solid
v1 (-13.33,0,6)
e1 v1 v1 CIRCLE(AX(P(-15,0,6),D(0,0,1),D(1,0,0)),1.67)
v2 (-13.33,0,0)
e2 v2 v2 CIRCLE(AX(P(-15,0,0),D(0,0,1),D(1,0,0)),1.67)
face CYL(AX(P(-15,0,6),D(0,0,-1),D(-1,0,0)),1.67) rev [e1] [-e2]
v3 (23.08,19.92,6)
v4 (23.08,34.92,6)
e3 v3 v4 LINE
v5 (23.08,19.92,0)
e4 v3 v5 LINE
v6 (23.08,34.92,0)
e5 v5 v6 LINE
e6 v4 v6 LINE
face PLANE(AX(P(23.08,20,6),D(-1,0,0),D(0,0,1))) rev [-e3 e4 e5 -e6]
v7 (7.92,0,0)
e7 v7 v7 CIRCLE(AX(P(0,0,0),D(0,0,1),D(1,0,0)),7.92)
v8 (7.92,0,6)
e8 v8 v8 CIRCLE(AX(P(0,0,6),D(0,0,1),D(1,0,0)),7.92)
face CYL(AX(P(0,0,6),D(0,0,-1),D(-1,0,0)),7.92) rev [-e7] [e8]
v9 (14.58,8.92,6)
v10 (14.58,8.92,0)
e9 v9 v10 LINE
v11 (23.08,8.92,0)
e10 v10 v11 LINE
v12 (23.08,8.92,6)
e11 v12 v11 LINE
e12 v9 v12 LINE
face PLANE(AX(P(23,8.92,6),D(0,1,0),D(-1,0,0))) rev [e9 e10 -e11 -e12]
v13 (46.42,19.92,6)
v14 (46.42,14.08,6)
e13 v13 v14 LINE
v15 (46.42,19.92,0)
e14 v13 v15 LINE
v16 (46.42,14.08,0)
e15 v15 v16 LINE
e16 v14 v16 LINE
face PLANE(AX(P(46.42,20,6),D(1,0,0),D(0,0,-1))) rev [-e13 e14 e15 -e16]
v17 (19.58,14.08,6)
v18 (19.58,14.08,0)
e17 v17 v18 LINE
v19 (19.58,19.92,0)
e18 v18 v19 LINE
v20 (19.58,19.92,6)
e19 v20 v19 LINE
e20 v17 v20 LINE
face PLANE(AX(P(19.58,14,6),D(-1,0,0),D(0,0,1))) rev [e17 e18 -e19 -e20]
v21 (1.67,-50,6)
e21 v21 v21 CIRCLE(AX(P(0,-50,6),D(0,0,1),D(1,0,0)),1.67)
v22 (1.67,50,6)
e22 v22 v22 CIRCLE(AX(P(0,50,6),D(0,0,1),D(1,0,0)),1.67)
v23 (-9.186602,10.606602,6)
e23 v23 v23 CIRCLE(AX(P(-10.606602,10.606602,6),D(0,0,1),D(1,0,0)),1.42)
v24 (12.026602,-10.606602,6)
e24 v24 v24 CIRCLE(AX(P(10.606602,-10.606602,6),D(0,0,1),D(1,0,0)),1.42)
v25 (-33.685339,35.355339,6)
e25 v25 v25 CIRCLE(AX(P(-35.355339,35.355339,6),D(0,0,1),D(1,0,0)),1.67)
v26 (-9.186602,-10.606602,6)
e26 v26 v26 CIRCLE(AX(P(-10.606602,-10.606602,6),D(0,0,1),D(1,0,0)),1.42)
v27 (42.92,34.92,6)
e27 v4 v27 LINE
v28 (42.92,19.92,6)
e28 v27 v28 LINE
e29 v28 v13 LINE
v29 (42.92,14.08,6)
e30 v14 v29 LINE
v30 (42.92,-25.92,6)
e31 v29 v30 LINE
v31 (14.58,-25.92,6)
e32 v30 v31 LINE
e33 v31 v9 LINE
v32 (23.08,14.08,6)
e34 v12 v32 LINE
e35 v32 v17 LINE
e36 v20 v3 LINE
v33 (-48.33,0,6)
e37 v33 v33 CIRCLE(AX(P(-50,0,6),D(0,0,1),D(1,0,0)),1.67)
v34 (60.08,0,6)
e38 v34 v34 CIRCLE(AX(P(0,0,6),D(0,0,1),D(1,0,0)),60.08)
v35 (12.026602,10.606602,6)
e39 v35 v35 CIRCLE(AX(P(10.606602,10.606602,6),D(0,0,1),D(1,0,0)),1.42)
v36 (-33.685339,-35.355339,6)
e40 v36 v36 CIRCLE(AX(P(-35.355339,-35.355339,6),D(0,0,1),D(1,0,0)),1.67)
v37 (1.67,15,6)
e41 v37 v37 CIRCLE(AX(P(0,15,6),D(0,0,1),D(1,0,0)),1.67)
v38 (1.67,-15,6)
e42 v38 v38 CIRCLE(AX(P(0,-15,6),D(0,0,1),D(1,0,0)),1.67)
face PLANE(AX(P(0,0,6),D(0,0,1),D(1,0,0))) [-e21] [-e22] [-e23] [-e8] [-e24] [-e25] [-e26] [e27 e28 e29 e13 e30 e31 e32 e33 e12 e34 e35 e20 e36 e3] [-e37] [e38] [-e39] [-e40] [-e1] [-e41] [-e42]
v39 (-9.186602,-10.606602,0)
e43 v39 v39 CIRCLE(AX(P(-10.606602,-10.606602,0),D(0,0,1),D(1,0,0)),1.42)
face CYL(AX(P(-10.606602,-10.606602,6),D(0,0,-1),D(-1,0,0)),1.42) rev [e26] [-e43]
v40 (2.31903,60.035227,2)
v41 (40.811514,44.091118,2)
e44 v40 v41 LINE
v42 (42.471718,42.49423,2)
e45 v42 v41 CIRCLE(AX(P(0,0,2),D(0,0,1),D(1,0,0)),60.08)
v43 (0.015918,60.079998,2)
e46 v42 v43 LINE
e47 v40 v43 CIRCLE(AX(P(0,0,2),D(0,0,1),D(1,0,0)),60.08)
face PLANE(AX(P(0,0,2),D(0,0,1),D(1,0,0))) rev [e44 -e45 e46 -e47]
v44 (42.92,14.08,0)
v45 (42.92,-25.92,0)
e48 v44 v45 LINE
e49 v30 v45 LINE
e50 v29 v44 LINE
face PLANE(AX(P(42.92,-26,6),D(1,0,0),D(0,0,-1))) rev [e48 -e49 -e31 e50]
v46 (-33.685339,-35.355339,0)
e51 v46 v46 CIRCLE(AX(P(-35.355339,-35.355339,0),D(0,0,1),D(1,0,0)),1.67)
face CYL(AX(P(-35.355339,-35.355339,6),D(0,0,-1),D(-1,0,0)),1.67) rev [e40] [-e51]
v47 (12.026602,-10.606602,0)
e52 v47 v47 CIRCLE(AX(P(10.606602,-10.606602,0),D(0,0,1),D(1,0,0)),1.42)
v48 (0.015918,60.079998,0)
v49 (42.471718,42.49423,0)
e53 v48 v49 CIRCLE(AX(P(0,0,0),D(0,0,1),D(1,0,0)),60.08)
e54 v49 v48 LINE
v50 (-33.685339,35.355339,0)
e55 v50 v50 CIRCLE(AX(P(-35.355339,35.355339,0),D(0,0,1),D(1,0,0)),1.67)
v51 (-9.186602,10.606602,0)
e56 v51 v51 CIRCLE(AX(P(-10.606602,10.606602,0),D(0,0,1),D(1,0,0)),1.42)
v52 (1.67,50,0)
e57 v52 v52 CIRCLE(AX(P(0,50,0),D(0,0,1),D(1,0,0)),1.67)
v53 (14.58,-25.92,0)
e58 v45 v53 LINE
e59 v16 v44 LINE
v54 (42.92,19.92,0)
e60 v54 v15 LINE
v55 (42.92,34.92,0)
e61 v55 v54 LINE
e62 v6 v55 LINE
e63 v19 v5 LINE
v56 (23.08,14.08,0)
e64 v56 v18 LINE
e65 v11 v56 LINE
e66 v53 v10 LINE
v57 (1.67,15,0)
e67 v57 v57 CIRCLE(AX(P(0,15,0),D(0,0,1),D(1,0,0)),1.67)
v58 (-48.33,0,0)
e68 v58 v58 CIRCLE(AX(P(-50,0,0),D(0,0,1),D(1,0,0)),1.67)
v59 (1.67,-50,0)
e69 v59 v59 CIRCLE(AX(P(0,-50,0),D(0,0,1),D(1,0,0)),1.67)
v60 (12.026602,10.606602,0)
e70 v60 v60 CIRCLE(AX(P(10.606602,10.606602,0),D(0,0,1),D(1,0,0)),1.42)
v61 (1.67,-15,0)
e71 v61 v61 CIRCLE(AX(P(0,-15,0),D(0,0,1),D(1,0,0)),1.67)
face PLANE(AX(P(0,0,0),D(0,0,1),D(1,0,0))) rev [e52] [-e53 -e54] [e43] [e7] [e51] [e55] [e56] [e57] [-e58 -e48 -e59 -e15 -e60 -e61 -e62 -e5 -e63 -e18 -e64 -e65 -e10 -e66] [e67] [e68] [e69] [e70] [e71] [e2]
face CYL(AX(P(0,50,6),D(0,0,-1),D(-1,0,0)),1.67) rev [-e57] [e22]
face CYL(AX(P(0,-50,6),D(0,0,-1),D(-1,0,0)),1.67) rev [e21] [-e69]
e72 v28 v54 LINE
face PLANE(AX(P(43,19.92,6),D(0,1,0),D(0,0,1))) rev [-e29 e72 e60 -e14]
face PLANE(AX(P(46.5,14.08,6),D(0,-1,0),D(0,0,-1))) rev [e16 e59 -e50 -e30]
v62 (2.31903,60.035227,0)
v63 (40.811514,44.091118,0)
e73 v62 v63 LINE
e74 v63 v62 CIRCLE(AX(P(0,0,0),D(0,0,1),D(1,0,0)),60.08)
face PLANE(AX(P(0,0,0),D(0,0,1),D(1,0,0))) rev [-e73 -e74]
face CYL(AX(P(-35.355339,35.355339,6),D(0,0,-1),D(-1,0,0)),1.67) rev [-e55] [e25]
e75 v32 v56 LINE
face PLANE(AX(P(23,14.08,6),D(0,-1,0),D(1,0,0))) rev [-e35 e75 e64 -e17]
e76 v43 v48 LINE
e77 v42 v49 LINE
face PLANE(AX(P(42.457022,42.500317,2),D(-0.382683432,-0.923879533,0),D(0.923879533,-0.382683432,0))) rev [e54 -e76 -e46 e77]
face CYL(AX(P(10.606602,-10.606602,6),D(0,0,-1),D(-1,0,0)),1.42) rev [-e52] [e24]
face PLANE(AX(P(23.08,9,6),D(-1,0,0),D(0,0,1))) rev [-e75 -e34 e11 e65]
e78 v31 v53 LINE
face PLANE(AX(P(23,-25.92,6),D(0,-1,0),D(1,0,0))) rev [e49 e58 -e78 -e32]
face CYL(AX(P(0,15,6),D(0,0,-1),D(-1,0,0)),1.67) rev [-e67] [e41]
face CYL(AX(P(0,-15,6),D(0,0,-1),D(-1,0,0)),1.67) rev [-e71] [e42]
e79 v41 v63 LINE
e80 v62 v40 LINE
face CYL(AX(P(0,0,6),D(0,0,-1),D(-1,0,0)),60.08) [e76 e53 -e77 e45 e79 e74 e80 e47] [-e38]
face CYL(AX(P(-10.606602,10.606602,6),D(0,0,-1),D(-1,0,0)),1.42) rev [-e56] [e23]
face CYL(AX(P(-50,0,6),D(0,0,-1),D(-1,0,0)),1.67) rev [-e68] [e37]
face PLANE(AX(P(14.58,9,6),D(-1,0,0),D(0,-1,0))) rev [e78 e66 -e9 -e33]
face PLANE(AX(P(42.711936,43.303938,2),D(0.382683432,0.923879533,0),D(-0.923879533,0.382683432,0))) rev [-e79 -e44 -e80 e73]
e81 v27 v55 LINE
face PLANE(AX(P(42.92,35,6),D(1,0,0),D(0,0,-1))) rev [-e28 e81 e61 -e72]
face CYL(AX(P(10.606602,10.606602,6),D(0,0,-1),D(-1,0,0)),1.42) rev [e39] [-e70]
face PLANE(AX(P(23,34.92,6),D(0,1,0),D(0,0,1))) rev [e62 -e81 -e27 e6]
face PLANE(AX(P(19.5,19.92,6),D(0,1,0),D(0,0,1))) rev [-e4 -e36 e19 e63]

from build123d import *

# Parameters (mm, degrees)
SKETCH1_R              = 60
SKETCH1_R_2            = 8
SKETCH1_R_3            = 1.75
SKETCH1_R_4            = 1.5
BOSS_EXTRUDE1_DEPTH    = 6
CUT_EXTRUDE6_DEPTH     = 86.064681273
CUT_EXTRUDE7_DEPTH     = 2
MOVE_FACE2_OUTLINE_R   = 8
MOVE_FACE2_OUTLINE_R_2 = 7.92
MOVE_FACE2_OUTLINE_R_3 = 1.75
MOVE_FACE2_OUTLINE_R_4 = 1.67
MOVE_FACE2_OUTLINE_R_5 = 1.5
MOVE_FACE2_OUTLINE_R_6 = 1.42
MOVE_FACE2_DEPTH       = 6
MOVE_START             = 2
MOVE_FACE2_2_DEPTH     = 4


# Read off the part's stored shape, not the designer's step: Move Face2
with BuildPart() as part:
    # Sketch1 → Boss-Extrude1 (new body)
    with BuildSketch(Plane.XY):
        Circle(SKETCH1_R)
        Circle(SKETCH1_R_2, mode=Mode.SUBTRACT)
        with Locations((0, -15)):
            Circle(SKETCH1_R_3, mode=Mode.SUBTRACT)
        with Locations((10.606601718, -10.606601718)):
            Circle(SKETCH1_R_4, mode=Mode.SUBTRACT)
        with Locations((0, -50)):
            Circle(SKETCH1_R_3, mode=Mode.SUBTRACT)
        with Locations((-15, 0)):
            Circle(SKETCH1_R_3, mode=Mode.SUBTRACT)
        with Locations((-10.606601718, -10.606601718)):
            Circle(SKETCH1_R_4, mode=Mode.SUBTRACT)
        with Locations((0, 15)):
            Circle(SKETCH1_R_3, mode=Mode.SUBTRACT)
        with Locations((-10.606601718, 10.606601718)):
            Circle(SKETCH1_R_4, mode=Mode.SUBTRACT)
        with Locations((10.606601718, 10.606601718)):
            Circle(SKETCH1_R_4, mode=Mode.SUBTRACT)
        with Locations((-35.355339059, -35.355339059)):
            Circle(SKETCH1_R_3, mode=Mode.SUBTRACT)
        with Locations((-35.355339059, 35.355339059)):
            Circle(SKETCH1_R_3, mode=Mode.SUBTRACT)
        with Locations((-50, 0)):
            Circle(SKETCH1_R_3, mode=Mode.SUBTRACT)
        with Locations((0, 50)):
            Circle(SKETCH1_R_3, mode=Mode.SUBTRACT)
    extrude(amount=BOSS_EXTRUDE1_DEPTH)

    # Sketch7 → Cut-Extrude6 (cut, through all)
    with BuildSketch(Plane(origin=(0, 0, 0), x_dir=(-1, 0, 0), z_dir=(0, 0, -1))):
        Polygon((-43, -26), (-23, -26), (-14.5, -26), (-14.5, 9), (-23, 9), (-23, 14), (-19.5, 14), (-19.5, 20), (-23, 20), (-23, 35), (-43, 35), (-43, 20), (-46.5, 20), (-46.5, 14), (-43, 14), align=None)
    extrude(amount=-CUT_EXTRUDE6_DEPTH, mode=Mode.SUBTRACT)

    # Sketch8 → Cut-Extrude7 (cut)
    with BuildSketch(Plane(origin=(0, 0, 0), x_dir=(-1, 0, 0), z_dir=(0, 0, -1))):
        Polygon((-42.426406871, 42.426406871), (0, 60), (-0.316144007, 60.951441065), (-42.742550878, 43.377847936), align=None)
    extrude(amount=-CUT_EXTRUDE7_DEPTH, mode=Mode.SUBTRACT)

    # Move Face2 outline → Move Face2 (add)
    # profile 1 of 16: a face of its own
    with BuildSketch(Plane.XY):
        with BuildLine():
            ThreePointArc((0.01591808, 60.079997891), (-22.991620616, -55.506682313), (42.47171814, 42.494229705))
            Line((42.47171814, 42.494229705), (0.01591808, 60.079997891))
        make_face()
        with BuildLine():
            Line((0, 60), (42.426406871, 42.426406871))
            ThreePointArc((42.426406871, 42.426406871), (-22.961005942, -55.432771951), (0, 60))
        make_face(mode=Mode.SUBTRACT)
    # profile 2 of 16: a face of its own
    with BuildSketch(Plane.XY):
        with BuildLine():
            ThreePointArc((40.811514416, 44.091118052), (22.991620617, 55.506682313), (2.319029971, 60.035227159))
            Line((2.319029971, 60.035227159), (40.811514416, 44.091118052))
        make_face()
        with BuildLine():
            ThreePointArc((2.767270729, 59.936151134), (22.961005942, 55.432771951), (40.424503007, 44.338014803))
            Line((40.424503007, 44.338014803), (2.767270729, 59.936151134))
        make_face(mode=Mode.SUBTRACT)
    # profile 3 of 16: a face of its own
    with BuildSketch(Plane.XY):
        Circle(MOVE_FACE2_OUTLINE_R)
        Circle(MOVE_FACE2_OUTLINE_R_2, mode=Mode.SUBTRACT)
    # profile 4 of 16: a face of its own
    with BuildSketch(Plane.XY):
        with Locations((0, -15)):
            Circle(MOVE_FACE2_OUTLINE_R_3)
        with Locations((0, -15)):
            Circle(MOVE_FACE2_OUTLINE_R_4, mode=Mode.SUBTRACT)
    # profile 5 of 16: a face of its own
    with BuildSketch(Plane.XY):
        with Locations((10.606601718, -10.606601718)):
            Circle(MOVE_FACE2_OUTLINE_R_5)
        with Locations((10.606601718, -10.606601718)):
            Circle(MOVE_FACE2_OUTLINE_R_6, mode=Mode.SUBTRACT)
    # profile 6 of 16: a face of its own
    with BuildSketch(Plane.XY):
        with Locations((0, -50)):
            Circle(MOVE_FACE2_OUTLINE_R_3)
        with Locations((0, -50)):
            Circle(MOVE_FACE2_OUTLINE_R_4, mode=Mode.SUBTRACT)
    # profile 7 of 16: a face of its own
    with BuildSketch(Plane.XY):
        with Locations((-35.355339059, -35.355339059)):
            Circle(MOVE_FACE2_OUTLINE_R_3)
        with Locations((-35.355339059, -35.355339059)):
            Circle(MOVE_FACE2_OUTLINE_R_4, mode=Mode.SUBTRACT)
    # profile 8 of 16: a face of its own
    with BuildSketch(Plane.XY):
        with Locations((-15, 0)):
            Circle(MOVE_FACE2_OUTLINE_R_3)
        with Locations((-15, 0)):
            Circle(MOVE_FACE2_OUTLINE_R_4, mode=Mode.SUBTRACT)
    # profile 9 of 16: a face of its own
    with BuildSketch(Plane.XY):
        with Locations((-10.606601718, -10.606601718)):
            Circle(MOVE_FACE2_OUTLINE_R_5)
        with Locations((-10.606601718, -10.606601718)):
            Circle(MOVE_FACE2_OUTLINE_R_6, mode=Mode.SUBTRACT)
    # profile 10 of 16: a face of its own
    with BuildSketch(Plane.XY):
        with Locations((0, 15)):
            Circle(MOVE_FACE2_OUTLINE_R_3)
        with Locations((0, 15)):
            Circle(MOVE_FACE2_OUTLINE_R_4, mode=Mode.SUBTRACT)
    # profile 11 of 16: a face of its own
    with BuildSketch(Plane.XY):
        with Locations((-10.606601718, 10.606601718)):
            Circle(MOVE_FACE2_OUTLINE_R_5)
        with Locations((-10.606601718, 10.606601718)):
            Circle(MOVE_FACE2_OUTLINE_R_6, mode=Mode.SUBTRACT)
    # profile 12 of 16: a face of its own
    with BuildSketch(Plane.XY):
        with Locations((10.606601718, 10.606601718)):
            Circle(MOVE_FACE2_OUTLINE_R_5)
        with Locations((10.606601718, 10.606601718)):
            Circle(MOVE_FACE2_OUTLINE_R_6, mode=Mode.SUBTRACT)
    # profile 13 of 16: a face of its own
    with BuildSketch(Plane.XY):
        with Locations((-50, 0)):
            Circle(MOVE_FACE2_OUTLINE_R_3)
        with Locations((-50, 0)):
            Circle(MOVE_FACE2_OUTLINE_R_4, mode=Mode.SUBTRACT)
    # profile 14 of 16: a face of its own
    with BuildSketch(Plane.XY):
        with Locations((-35.355339059, 35.355339059)):
            Circle(MOVE_FACE2_OUTLINE_R_3)
        with Locations((-35.355339059, 35.355339059)):
            Circle(MOVE_FACE2_OUTLINE_R_4, mode=Mode.SUBTRACT)
    # profile 15 of 16: a face of its own
    with BuildSketch(Plane.XY):
        with Locations((0, 50)):
            Circle(MOVE_FACE2_OUTLINE_R_3)
        with Locations((0, 50)):
            Circle(MOVE_FACE2_OUTLINE_R_4, mode=Mode.SUBTRACT)
    # profile 16 of 16: a face of its own
    with BuildSketch(Plane.XY):
        Polygon((14.5, -26), (43, -26), (43, 14), (46.5, 14), (46.5, 20), (43, 20), (43, 35), (23, 35), (23, 20), (19.5, 20), (19.5, 14), (23, 14), (23, 9), (14.5, 9), align=None)
        Polygon((42.92, 14.08), (42.92, -25.92), (14.58, -25.92), (14.58, 8.92), (23.08, 8.92), (23.08, 14.08), (19.58, 14.08), (19.58, 19.92), (23.08, 19.92), (23.08, 34.92), (42.92, 34.92), (42.92, 19.92), (46.42, 19.92), (46.42, 14.08), align=None, mode=Mode.SUBTRACT)
    extrude(amount=MOVE_FACE2_DEPTH)

    # Move Face2 2 outline → Move Face2 2 (add)
    with BuildSketch(Plane.XY.offset(MOVE_START)):
        with BuildLine():
            Line((42.277699454, 42.574594876), (42.47171814, 42.494229705))
            ThreePointArc((42.47171814, 42.494229705), (41.649270334, 43.300631412), (40.811514416, 44.091118052))
            Line((40.811514416, 44.091118052), (40.597304781, 44.179846588))
            ThreePointArc((40.597304781, 44.179846588), (41.44527464, 43.385357092), (42.277699454, 42.574594876))
        make_face()
        with BuildLine():
            ThreePointArc((2.319029971, 60.035227159), (1.167688616, 60.068651585), (0.01591808, 60.079997891))
            Line((0.01591808, 60.079997891), (0.209936765, 59.99963272))
            ThreePointArc((0.209936765, 59.99963272), (1.371845458, 59.98431495), (2.533239607, 59.946498622))
            Line((2.533239607, 59.946498622), (2.319029971, 60.035227159))
        make_face()
    extrude(amount=MOVE_FACE2_2_DEPTH)


solid = part.part
